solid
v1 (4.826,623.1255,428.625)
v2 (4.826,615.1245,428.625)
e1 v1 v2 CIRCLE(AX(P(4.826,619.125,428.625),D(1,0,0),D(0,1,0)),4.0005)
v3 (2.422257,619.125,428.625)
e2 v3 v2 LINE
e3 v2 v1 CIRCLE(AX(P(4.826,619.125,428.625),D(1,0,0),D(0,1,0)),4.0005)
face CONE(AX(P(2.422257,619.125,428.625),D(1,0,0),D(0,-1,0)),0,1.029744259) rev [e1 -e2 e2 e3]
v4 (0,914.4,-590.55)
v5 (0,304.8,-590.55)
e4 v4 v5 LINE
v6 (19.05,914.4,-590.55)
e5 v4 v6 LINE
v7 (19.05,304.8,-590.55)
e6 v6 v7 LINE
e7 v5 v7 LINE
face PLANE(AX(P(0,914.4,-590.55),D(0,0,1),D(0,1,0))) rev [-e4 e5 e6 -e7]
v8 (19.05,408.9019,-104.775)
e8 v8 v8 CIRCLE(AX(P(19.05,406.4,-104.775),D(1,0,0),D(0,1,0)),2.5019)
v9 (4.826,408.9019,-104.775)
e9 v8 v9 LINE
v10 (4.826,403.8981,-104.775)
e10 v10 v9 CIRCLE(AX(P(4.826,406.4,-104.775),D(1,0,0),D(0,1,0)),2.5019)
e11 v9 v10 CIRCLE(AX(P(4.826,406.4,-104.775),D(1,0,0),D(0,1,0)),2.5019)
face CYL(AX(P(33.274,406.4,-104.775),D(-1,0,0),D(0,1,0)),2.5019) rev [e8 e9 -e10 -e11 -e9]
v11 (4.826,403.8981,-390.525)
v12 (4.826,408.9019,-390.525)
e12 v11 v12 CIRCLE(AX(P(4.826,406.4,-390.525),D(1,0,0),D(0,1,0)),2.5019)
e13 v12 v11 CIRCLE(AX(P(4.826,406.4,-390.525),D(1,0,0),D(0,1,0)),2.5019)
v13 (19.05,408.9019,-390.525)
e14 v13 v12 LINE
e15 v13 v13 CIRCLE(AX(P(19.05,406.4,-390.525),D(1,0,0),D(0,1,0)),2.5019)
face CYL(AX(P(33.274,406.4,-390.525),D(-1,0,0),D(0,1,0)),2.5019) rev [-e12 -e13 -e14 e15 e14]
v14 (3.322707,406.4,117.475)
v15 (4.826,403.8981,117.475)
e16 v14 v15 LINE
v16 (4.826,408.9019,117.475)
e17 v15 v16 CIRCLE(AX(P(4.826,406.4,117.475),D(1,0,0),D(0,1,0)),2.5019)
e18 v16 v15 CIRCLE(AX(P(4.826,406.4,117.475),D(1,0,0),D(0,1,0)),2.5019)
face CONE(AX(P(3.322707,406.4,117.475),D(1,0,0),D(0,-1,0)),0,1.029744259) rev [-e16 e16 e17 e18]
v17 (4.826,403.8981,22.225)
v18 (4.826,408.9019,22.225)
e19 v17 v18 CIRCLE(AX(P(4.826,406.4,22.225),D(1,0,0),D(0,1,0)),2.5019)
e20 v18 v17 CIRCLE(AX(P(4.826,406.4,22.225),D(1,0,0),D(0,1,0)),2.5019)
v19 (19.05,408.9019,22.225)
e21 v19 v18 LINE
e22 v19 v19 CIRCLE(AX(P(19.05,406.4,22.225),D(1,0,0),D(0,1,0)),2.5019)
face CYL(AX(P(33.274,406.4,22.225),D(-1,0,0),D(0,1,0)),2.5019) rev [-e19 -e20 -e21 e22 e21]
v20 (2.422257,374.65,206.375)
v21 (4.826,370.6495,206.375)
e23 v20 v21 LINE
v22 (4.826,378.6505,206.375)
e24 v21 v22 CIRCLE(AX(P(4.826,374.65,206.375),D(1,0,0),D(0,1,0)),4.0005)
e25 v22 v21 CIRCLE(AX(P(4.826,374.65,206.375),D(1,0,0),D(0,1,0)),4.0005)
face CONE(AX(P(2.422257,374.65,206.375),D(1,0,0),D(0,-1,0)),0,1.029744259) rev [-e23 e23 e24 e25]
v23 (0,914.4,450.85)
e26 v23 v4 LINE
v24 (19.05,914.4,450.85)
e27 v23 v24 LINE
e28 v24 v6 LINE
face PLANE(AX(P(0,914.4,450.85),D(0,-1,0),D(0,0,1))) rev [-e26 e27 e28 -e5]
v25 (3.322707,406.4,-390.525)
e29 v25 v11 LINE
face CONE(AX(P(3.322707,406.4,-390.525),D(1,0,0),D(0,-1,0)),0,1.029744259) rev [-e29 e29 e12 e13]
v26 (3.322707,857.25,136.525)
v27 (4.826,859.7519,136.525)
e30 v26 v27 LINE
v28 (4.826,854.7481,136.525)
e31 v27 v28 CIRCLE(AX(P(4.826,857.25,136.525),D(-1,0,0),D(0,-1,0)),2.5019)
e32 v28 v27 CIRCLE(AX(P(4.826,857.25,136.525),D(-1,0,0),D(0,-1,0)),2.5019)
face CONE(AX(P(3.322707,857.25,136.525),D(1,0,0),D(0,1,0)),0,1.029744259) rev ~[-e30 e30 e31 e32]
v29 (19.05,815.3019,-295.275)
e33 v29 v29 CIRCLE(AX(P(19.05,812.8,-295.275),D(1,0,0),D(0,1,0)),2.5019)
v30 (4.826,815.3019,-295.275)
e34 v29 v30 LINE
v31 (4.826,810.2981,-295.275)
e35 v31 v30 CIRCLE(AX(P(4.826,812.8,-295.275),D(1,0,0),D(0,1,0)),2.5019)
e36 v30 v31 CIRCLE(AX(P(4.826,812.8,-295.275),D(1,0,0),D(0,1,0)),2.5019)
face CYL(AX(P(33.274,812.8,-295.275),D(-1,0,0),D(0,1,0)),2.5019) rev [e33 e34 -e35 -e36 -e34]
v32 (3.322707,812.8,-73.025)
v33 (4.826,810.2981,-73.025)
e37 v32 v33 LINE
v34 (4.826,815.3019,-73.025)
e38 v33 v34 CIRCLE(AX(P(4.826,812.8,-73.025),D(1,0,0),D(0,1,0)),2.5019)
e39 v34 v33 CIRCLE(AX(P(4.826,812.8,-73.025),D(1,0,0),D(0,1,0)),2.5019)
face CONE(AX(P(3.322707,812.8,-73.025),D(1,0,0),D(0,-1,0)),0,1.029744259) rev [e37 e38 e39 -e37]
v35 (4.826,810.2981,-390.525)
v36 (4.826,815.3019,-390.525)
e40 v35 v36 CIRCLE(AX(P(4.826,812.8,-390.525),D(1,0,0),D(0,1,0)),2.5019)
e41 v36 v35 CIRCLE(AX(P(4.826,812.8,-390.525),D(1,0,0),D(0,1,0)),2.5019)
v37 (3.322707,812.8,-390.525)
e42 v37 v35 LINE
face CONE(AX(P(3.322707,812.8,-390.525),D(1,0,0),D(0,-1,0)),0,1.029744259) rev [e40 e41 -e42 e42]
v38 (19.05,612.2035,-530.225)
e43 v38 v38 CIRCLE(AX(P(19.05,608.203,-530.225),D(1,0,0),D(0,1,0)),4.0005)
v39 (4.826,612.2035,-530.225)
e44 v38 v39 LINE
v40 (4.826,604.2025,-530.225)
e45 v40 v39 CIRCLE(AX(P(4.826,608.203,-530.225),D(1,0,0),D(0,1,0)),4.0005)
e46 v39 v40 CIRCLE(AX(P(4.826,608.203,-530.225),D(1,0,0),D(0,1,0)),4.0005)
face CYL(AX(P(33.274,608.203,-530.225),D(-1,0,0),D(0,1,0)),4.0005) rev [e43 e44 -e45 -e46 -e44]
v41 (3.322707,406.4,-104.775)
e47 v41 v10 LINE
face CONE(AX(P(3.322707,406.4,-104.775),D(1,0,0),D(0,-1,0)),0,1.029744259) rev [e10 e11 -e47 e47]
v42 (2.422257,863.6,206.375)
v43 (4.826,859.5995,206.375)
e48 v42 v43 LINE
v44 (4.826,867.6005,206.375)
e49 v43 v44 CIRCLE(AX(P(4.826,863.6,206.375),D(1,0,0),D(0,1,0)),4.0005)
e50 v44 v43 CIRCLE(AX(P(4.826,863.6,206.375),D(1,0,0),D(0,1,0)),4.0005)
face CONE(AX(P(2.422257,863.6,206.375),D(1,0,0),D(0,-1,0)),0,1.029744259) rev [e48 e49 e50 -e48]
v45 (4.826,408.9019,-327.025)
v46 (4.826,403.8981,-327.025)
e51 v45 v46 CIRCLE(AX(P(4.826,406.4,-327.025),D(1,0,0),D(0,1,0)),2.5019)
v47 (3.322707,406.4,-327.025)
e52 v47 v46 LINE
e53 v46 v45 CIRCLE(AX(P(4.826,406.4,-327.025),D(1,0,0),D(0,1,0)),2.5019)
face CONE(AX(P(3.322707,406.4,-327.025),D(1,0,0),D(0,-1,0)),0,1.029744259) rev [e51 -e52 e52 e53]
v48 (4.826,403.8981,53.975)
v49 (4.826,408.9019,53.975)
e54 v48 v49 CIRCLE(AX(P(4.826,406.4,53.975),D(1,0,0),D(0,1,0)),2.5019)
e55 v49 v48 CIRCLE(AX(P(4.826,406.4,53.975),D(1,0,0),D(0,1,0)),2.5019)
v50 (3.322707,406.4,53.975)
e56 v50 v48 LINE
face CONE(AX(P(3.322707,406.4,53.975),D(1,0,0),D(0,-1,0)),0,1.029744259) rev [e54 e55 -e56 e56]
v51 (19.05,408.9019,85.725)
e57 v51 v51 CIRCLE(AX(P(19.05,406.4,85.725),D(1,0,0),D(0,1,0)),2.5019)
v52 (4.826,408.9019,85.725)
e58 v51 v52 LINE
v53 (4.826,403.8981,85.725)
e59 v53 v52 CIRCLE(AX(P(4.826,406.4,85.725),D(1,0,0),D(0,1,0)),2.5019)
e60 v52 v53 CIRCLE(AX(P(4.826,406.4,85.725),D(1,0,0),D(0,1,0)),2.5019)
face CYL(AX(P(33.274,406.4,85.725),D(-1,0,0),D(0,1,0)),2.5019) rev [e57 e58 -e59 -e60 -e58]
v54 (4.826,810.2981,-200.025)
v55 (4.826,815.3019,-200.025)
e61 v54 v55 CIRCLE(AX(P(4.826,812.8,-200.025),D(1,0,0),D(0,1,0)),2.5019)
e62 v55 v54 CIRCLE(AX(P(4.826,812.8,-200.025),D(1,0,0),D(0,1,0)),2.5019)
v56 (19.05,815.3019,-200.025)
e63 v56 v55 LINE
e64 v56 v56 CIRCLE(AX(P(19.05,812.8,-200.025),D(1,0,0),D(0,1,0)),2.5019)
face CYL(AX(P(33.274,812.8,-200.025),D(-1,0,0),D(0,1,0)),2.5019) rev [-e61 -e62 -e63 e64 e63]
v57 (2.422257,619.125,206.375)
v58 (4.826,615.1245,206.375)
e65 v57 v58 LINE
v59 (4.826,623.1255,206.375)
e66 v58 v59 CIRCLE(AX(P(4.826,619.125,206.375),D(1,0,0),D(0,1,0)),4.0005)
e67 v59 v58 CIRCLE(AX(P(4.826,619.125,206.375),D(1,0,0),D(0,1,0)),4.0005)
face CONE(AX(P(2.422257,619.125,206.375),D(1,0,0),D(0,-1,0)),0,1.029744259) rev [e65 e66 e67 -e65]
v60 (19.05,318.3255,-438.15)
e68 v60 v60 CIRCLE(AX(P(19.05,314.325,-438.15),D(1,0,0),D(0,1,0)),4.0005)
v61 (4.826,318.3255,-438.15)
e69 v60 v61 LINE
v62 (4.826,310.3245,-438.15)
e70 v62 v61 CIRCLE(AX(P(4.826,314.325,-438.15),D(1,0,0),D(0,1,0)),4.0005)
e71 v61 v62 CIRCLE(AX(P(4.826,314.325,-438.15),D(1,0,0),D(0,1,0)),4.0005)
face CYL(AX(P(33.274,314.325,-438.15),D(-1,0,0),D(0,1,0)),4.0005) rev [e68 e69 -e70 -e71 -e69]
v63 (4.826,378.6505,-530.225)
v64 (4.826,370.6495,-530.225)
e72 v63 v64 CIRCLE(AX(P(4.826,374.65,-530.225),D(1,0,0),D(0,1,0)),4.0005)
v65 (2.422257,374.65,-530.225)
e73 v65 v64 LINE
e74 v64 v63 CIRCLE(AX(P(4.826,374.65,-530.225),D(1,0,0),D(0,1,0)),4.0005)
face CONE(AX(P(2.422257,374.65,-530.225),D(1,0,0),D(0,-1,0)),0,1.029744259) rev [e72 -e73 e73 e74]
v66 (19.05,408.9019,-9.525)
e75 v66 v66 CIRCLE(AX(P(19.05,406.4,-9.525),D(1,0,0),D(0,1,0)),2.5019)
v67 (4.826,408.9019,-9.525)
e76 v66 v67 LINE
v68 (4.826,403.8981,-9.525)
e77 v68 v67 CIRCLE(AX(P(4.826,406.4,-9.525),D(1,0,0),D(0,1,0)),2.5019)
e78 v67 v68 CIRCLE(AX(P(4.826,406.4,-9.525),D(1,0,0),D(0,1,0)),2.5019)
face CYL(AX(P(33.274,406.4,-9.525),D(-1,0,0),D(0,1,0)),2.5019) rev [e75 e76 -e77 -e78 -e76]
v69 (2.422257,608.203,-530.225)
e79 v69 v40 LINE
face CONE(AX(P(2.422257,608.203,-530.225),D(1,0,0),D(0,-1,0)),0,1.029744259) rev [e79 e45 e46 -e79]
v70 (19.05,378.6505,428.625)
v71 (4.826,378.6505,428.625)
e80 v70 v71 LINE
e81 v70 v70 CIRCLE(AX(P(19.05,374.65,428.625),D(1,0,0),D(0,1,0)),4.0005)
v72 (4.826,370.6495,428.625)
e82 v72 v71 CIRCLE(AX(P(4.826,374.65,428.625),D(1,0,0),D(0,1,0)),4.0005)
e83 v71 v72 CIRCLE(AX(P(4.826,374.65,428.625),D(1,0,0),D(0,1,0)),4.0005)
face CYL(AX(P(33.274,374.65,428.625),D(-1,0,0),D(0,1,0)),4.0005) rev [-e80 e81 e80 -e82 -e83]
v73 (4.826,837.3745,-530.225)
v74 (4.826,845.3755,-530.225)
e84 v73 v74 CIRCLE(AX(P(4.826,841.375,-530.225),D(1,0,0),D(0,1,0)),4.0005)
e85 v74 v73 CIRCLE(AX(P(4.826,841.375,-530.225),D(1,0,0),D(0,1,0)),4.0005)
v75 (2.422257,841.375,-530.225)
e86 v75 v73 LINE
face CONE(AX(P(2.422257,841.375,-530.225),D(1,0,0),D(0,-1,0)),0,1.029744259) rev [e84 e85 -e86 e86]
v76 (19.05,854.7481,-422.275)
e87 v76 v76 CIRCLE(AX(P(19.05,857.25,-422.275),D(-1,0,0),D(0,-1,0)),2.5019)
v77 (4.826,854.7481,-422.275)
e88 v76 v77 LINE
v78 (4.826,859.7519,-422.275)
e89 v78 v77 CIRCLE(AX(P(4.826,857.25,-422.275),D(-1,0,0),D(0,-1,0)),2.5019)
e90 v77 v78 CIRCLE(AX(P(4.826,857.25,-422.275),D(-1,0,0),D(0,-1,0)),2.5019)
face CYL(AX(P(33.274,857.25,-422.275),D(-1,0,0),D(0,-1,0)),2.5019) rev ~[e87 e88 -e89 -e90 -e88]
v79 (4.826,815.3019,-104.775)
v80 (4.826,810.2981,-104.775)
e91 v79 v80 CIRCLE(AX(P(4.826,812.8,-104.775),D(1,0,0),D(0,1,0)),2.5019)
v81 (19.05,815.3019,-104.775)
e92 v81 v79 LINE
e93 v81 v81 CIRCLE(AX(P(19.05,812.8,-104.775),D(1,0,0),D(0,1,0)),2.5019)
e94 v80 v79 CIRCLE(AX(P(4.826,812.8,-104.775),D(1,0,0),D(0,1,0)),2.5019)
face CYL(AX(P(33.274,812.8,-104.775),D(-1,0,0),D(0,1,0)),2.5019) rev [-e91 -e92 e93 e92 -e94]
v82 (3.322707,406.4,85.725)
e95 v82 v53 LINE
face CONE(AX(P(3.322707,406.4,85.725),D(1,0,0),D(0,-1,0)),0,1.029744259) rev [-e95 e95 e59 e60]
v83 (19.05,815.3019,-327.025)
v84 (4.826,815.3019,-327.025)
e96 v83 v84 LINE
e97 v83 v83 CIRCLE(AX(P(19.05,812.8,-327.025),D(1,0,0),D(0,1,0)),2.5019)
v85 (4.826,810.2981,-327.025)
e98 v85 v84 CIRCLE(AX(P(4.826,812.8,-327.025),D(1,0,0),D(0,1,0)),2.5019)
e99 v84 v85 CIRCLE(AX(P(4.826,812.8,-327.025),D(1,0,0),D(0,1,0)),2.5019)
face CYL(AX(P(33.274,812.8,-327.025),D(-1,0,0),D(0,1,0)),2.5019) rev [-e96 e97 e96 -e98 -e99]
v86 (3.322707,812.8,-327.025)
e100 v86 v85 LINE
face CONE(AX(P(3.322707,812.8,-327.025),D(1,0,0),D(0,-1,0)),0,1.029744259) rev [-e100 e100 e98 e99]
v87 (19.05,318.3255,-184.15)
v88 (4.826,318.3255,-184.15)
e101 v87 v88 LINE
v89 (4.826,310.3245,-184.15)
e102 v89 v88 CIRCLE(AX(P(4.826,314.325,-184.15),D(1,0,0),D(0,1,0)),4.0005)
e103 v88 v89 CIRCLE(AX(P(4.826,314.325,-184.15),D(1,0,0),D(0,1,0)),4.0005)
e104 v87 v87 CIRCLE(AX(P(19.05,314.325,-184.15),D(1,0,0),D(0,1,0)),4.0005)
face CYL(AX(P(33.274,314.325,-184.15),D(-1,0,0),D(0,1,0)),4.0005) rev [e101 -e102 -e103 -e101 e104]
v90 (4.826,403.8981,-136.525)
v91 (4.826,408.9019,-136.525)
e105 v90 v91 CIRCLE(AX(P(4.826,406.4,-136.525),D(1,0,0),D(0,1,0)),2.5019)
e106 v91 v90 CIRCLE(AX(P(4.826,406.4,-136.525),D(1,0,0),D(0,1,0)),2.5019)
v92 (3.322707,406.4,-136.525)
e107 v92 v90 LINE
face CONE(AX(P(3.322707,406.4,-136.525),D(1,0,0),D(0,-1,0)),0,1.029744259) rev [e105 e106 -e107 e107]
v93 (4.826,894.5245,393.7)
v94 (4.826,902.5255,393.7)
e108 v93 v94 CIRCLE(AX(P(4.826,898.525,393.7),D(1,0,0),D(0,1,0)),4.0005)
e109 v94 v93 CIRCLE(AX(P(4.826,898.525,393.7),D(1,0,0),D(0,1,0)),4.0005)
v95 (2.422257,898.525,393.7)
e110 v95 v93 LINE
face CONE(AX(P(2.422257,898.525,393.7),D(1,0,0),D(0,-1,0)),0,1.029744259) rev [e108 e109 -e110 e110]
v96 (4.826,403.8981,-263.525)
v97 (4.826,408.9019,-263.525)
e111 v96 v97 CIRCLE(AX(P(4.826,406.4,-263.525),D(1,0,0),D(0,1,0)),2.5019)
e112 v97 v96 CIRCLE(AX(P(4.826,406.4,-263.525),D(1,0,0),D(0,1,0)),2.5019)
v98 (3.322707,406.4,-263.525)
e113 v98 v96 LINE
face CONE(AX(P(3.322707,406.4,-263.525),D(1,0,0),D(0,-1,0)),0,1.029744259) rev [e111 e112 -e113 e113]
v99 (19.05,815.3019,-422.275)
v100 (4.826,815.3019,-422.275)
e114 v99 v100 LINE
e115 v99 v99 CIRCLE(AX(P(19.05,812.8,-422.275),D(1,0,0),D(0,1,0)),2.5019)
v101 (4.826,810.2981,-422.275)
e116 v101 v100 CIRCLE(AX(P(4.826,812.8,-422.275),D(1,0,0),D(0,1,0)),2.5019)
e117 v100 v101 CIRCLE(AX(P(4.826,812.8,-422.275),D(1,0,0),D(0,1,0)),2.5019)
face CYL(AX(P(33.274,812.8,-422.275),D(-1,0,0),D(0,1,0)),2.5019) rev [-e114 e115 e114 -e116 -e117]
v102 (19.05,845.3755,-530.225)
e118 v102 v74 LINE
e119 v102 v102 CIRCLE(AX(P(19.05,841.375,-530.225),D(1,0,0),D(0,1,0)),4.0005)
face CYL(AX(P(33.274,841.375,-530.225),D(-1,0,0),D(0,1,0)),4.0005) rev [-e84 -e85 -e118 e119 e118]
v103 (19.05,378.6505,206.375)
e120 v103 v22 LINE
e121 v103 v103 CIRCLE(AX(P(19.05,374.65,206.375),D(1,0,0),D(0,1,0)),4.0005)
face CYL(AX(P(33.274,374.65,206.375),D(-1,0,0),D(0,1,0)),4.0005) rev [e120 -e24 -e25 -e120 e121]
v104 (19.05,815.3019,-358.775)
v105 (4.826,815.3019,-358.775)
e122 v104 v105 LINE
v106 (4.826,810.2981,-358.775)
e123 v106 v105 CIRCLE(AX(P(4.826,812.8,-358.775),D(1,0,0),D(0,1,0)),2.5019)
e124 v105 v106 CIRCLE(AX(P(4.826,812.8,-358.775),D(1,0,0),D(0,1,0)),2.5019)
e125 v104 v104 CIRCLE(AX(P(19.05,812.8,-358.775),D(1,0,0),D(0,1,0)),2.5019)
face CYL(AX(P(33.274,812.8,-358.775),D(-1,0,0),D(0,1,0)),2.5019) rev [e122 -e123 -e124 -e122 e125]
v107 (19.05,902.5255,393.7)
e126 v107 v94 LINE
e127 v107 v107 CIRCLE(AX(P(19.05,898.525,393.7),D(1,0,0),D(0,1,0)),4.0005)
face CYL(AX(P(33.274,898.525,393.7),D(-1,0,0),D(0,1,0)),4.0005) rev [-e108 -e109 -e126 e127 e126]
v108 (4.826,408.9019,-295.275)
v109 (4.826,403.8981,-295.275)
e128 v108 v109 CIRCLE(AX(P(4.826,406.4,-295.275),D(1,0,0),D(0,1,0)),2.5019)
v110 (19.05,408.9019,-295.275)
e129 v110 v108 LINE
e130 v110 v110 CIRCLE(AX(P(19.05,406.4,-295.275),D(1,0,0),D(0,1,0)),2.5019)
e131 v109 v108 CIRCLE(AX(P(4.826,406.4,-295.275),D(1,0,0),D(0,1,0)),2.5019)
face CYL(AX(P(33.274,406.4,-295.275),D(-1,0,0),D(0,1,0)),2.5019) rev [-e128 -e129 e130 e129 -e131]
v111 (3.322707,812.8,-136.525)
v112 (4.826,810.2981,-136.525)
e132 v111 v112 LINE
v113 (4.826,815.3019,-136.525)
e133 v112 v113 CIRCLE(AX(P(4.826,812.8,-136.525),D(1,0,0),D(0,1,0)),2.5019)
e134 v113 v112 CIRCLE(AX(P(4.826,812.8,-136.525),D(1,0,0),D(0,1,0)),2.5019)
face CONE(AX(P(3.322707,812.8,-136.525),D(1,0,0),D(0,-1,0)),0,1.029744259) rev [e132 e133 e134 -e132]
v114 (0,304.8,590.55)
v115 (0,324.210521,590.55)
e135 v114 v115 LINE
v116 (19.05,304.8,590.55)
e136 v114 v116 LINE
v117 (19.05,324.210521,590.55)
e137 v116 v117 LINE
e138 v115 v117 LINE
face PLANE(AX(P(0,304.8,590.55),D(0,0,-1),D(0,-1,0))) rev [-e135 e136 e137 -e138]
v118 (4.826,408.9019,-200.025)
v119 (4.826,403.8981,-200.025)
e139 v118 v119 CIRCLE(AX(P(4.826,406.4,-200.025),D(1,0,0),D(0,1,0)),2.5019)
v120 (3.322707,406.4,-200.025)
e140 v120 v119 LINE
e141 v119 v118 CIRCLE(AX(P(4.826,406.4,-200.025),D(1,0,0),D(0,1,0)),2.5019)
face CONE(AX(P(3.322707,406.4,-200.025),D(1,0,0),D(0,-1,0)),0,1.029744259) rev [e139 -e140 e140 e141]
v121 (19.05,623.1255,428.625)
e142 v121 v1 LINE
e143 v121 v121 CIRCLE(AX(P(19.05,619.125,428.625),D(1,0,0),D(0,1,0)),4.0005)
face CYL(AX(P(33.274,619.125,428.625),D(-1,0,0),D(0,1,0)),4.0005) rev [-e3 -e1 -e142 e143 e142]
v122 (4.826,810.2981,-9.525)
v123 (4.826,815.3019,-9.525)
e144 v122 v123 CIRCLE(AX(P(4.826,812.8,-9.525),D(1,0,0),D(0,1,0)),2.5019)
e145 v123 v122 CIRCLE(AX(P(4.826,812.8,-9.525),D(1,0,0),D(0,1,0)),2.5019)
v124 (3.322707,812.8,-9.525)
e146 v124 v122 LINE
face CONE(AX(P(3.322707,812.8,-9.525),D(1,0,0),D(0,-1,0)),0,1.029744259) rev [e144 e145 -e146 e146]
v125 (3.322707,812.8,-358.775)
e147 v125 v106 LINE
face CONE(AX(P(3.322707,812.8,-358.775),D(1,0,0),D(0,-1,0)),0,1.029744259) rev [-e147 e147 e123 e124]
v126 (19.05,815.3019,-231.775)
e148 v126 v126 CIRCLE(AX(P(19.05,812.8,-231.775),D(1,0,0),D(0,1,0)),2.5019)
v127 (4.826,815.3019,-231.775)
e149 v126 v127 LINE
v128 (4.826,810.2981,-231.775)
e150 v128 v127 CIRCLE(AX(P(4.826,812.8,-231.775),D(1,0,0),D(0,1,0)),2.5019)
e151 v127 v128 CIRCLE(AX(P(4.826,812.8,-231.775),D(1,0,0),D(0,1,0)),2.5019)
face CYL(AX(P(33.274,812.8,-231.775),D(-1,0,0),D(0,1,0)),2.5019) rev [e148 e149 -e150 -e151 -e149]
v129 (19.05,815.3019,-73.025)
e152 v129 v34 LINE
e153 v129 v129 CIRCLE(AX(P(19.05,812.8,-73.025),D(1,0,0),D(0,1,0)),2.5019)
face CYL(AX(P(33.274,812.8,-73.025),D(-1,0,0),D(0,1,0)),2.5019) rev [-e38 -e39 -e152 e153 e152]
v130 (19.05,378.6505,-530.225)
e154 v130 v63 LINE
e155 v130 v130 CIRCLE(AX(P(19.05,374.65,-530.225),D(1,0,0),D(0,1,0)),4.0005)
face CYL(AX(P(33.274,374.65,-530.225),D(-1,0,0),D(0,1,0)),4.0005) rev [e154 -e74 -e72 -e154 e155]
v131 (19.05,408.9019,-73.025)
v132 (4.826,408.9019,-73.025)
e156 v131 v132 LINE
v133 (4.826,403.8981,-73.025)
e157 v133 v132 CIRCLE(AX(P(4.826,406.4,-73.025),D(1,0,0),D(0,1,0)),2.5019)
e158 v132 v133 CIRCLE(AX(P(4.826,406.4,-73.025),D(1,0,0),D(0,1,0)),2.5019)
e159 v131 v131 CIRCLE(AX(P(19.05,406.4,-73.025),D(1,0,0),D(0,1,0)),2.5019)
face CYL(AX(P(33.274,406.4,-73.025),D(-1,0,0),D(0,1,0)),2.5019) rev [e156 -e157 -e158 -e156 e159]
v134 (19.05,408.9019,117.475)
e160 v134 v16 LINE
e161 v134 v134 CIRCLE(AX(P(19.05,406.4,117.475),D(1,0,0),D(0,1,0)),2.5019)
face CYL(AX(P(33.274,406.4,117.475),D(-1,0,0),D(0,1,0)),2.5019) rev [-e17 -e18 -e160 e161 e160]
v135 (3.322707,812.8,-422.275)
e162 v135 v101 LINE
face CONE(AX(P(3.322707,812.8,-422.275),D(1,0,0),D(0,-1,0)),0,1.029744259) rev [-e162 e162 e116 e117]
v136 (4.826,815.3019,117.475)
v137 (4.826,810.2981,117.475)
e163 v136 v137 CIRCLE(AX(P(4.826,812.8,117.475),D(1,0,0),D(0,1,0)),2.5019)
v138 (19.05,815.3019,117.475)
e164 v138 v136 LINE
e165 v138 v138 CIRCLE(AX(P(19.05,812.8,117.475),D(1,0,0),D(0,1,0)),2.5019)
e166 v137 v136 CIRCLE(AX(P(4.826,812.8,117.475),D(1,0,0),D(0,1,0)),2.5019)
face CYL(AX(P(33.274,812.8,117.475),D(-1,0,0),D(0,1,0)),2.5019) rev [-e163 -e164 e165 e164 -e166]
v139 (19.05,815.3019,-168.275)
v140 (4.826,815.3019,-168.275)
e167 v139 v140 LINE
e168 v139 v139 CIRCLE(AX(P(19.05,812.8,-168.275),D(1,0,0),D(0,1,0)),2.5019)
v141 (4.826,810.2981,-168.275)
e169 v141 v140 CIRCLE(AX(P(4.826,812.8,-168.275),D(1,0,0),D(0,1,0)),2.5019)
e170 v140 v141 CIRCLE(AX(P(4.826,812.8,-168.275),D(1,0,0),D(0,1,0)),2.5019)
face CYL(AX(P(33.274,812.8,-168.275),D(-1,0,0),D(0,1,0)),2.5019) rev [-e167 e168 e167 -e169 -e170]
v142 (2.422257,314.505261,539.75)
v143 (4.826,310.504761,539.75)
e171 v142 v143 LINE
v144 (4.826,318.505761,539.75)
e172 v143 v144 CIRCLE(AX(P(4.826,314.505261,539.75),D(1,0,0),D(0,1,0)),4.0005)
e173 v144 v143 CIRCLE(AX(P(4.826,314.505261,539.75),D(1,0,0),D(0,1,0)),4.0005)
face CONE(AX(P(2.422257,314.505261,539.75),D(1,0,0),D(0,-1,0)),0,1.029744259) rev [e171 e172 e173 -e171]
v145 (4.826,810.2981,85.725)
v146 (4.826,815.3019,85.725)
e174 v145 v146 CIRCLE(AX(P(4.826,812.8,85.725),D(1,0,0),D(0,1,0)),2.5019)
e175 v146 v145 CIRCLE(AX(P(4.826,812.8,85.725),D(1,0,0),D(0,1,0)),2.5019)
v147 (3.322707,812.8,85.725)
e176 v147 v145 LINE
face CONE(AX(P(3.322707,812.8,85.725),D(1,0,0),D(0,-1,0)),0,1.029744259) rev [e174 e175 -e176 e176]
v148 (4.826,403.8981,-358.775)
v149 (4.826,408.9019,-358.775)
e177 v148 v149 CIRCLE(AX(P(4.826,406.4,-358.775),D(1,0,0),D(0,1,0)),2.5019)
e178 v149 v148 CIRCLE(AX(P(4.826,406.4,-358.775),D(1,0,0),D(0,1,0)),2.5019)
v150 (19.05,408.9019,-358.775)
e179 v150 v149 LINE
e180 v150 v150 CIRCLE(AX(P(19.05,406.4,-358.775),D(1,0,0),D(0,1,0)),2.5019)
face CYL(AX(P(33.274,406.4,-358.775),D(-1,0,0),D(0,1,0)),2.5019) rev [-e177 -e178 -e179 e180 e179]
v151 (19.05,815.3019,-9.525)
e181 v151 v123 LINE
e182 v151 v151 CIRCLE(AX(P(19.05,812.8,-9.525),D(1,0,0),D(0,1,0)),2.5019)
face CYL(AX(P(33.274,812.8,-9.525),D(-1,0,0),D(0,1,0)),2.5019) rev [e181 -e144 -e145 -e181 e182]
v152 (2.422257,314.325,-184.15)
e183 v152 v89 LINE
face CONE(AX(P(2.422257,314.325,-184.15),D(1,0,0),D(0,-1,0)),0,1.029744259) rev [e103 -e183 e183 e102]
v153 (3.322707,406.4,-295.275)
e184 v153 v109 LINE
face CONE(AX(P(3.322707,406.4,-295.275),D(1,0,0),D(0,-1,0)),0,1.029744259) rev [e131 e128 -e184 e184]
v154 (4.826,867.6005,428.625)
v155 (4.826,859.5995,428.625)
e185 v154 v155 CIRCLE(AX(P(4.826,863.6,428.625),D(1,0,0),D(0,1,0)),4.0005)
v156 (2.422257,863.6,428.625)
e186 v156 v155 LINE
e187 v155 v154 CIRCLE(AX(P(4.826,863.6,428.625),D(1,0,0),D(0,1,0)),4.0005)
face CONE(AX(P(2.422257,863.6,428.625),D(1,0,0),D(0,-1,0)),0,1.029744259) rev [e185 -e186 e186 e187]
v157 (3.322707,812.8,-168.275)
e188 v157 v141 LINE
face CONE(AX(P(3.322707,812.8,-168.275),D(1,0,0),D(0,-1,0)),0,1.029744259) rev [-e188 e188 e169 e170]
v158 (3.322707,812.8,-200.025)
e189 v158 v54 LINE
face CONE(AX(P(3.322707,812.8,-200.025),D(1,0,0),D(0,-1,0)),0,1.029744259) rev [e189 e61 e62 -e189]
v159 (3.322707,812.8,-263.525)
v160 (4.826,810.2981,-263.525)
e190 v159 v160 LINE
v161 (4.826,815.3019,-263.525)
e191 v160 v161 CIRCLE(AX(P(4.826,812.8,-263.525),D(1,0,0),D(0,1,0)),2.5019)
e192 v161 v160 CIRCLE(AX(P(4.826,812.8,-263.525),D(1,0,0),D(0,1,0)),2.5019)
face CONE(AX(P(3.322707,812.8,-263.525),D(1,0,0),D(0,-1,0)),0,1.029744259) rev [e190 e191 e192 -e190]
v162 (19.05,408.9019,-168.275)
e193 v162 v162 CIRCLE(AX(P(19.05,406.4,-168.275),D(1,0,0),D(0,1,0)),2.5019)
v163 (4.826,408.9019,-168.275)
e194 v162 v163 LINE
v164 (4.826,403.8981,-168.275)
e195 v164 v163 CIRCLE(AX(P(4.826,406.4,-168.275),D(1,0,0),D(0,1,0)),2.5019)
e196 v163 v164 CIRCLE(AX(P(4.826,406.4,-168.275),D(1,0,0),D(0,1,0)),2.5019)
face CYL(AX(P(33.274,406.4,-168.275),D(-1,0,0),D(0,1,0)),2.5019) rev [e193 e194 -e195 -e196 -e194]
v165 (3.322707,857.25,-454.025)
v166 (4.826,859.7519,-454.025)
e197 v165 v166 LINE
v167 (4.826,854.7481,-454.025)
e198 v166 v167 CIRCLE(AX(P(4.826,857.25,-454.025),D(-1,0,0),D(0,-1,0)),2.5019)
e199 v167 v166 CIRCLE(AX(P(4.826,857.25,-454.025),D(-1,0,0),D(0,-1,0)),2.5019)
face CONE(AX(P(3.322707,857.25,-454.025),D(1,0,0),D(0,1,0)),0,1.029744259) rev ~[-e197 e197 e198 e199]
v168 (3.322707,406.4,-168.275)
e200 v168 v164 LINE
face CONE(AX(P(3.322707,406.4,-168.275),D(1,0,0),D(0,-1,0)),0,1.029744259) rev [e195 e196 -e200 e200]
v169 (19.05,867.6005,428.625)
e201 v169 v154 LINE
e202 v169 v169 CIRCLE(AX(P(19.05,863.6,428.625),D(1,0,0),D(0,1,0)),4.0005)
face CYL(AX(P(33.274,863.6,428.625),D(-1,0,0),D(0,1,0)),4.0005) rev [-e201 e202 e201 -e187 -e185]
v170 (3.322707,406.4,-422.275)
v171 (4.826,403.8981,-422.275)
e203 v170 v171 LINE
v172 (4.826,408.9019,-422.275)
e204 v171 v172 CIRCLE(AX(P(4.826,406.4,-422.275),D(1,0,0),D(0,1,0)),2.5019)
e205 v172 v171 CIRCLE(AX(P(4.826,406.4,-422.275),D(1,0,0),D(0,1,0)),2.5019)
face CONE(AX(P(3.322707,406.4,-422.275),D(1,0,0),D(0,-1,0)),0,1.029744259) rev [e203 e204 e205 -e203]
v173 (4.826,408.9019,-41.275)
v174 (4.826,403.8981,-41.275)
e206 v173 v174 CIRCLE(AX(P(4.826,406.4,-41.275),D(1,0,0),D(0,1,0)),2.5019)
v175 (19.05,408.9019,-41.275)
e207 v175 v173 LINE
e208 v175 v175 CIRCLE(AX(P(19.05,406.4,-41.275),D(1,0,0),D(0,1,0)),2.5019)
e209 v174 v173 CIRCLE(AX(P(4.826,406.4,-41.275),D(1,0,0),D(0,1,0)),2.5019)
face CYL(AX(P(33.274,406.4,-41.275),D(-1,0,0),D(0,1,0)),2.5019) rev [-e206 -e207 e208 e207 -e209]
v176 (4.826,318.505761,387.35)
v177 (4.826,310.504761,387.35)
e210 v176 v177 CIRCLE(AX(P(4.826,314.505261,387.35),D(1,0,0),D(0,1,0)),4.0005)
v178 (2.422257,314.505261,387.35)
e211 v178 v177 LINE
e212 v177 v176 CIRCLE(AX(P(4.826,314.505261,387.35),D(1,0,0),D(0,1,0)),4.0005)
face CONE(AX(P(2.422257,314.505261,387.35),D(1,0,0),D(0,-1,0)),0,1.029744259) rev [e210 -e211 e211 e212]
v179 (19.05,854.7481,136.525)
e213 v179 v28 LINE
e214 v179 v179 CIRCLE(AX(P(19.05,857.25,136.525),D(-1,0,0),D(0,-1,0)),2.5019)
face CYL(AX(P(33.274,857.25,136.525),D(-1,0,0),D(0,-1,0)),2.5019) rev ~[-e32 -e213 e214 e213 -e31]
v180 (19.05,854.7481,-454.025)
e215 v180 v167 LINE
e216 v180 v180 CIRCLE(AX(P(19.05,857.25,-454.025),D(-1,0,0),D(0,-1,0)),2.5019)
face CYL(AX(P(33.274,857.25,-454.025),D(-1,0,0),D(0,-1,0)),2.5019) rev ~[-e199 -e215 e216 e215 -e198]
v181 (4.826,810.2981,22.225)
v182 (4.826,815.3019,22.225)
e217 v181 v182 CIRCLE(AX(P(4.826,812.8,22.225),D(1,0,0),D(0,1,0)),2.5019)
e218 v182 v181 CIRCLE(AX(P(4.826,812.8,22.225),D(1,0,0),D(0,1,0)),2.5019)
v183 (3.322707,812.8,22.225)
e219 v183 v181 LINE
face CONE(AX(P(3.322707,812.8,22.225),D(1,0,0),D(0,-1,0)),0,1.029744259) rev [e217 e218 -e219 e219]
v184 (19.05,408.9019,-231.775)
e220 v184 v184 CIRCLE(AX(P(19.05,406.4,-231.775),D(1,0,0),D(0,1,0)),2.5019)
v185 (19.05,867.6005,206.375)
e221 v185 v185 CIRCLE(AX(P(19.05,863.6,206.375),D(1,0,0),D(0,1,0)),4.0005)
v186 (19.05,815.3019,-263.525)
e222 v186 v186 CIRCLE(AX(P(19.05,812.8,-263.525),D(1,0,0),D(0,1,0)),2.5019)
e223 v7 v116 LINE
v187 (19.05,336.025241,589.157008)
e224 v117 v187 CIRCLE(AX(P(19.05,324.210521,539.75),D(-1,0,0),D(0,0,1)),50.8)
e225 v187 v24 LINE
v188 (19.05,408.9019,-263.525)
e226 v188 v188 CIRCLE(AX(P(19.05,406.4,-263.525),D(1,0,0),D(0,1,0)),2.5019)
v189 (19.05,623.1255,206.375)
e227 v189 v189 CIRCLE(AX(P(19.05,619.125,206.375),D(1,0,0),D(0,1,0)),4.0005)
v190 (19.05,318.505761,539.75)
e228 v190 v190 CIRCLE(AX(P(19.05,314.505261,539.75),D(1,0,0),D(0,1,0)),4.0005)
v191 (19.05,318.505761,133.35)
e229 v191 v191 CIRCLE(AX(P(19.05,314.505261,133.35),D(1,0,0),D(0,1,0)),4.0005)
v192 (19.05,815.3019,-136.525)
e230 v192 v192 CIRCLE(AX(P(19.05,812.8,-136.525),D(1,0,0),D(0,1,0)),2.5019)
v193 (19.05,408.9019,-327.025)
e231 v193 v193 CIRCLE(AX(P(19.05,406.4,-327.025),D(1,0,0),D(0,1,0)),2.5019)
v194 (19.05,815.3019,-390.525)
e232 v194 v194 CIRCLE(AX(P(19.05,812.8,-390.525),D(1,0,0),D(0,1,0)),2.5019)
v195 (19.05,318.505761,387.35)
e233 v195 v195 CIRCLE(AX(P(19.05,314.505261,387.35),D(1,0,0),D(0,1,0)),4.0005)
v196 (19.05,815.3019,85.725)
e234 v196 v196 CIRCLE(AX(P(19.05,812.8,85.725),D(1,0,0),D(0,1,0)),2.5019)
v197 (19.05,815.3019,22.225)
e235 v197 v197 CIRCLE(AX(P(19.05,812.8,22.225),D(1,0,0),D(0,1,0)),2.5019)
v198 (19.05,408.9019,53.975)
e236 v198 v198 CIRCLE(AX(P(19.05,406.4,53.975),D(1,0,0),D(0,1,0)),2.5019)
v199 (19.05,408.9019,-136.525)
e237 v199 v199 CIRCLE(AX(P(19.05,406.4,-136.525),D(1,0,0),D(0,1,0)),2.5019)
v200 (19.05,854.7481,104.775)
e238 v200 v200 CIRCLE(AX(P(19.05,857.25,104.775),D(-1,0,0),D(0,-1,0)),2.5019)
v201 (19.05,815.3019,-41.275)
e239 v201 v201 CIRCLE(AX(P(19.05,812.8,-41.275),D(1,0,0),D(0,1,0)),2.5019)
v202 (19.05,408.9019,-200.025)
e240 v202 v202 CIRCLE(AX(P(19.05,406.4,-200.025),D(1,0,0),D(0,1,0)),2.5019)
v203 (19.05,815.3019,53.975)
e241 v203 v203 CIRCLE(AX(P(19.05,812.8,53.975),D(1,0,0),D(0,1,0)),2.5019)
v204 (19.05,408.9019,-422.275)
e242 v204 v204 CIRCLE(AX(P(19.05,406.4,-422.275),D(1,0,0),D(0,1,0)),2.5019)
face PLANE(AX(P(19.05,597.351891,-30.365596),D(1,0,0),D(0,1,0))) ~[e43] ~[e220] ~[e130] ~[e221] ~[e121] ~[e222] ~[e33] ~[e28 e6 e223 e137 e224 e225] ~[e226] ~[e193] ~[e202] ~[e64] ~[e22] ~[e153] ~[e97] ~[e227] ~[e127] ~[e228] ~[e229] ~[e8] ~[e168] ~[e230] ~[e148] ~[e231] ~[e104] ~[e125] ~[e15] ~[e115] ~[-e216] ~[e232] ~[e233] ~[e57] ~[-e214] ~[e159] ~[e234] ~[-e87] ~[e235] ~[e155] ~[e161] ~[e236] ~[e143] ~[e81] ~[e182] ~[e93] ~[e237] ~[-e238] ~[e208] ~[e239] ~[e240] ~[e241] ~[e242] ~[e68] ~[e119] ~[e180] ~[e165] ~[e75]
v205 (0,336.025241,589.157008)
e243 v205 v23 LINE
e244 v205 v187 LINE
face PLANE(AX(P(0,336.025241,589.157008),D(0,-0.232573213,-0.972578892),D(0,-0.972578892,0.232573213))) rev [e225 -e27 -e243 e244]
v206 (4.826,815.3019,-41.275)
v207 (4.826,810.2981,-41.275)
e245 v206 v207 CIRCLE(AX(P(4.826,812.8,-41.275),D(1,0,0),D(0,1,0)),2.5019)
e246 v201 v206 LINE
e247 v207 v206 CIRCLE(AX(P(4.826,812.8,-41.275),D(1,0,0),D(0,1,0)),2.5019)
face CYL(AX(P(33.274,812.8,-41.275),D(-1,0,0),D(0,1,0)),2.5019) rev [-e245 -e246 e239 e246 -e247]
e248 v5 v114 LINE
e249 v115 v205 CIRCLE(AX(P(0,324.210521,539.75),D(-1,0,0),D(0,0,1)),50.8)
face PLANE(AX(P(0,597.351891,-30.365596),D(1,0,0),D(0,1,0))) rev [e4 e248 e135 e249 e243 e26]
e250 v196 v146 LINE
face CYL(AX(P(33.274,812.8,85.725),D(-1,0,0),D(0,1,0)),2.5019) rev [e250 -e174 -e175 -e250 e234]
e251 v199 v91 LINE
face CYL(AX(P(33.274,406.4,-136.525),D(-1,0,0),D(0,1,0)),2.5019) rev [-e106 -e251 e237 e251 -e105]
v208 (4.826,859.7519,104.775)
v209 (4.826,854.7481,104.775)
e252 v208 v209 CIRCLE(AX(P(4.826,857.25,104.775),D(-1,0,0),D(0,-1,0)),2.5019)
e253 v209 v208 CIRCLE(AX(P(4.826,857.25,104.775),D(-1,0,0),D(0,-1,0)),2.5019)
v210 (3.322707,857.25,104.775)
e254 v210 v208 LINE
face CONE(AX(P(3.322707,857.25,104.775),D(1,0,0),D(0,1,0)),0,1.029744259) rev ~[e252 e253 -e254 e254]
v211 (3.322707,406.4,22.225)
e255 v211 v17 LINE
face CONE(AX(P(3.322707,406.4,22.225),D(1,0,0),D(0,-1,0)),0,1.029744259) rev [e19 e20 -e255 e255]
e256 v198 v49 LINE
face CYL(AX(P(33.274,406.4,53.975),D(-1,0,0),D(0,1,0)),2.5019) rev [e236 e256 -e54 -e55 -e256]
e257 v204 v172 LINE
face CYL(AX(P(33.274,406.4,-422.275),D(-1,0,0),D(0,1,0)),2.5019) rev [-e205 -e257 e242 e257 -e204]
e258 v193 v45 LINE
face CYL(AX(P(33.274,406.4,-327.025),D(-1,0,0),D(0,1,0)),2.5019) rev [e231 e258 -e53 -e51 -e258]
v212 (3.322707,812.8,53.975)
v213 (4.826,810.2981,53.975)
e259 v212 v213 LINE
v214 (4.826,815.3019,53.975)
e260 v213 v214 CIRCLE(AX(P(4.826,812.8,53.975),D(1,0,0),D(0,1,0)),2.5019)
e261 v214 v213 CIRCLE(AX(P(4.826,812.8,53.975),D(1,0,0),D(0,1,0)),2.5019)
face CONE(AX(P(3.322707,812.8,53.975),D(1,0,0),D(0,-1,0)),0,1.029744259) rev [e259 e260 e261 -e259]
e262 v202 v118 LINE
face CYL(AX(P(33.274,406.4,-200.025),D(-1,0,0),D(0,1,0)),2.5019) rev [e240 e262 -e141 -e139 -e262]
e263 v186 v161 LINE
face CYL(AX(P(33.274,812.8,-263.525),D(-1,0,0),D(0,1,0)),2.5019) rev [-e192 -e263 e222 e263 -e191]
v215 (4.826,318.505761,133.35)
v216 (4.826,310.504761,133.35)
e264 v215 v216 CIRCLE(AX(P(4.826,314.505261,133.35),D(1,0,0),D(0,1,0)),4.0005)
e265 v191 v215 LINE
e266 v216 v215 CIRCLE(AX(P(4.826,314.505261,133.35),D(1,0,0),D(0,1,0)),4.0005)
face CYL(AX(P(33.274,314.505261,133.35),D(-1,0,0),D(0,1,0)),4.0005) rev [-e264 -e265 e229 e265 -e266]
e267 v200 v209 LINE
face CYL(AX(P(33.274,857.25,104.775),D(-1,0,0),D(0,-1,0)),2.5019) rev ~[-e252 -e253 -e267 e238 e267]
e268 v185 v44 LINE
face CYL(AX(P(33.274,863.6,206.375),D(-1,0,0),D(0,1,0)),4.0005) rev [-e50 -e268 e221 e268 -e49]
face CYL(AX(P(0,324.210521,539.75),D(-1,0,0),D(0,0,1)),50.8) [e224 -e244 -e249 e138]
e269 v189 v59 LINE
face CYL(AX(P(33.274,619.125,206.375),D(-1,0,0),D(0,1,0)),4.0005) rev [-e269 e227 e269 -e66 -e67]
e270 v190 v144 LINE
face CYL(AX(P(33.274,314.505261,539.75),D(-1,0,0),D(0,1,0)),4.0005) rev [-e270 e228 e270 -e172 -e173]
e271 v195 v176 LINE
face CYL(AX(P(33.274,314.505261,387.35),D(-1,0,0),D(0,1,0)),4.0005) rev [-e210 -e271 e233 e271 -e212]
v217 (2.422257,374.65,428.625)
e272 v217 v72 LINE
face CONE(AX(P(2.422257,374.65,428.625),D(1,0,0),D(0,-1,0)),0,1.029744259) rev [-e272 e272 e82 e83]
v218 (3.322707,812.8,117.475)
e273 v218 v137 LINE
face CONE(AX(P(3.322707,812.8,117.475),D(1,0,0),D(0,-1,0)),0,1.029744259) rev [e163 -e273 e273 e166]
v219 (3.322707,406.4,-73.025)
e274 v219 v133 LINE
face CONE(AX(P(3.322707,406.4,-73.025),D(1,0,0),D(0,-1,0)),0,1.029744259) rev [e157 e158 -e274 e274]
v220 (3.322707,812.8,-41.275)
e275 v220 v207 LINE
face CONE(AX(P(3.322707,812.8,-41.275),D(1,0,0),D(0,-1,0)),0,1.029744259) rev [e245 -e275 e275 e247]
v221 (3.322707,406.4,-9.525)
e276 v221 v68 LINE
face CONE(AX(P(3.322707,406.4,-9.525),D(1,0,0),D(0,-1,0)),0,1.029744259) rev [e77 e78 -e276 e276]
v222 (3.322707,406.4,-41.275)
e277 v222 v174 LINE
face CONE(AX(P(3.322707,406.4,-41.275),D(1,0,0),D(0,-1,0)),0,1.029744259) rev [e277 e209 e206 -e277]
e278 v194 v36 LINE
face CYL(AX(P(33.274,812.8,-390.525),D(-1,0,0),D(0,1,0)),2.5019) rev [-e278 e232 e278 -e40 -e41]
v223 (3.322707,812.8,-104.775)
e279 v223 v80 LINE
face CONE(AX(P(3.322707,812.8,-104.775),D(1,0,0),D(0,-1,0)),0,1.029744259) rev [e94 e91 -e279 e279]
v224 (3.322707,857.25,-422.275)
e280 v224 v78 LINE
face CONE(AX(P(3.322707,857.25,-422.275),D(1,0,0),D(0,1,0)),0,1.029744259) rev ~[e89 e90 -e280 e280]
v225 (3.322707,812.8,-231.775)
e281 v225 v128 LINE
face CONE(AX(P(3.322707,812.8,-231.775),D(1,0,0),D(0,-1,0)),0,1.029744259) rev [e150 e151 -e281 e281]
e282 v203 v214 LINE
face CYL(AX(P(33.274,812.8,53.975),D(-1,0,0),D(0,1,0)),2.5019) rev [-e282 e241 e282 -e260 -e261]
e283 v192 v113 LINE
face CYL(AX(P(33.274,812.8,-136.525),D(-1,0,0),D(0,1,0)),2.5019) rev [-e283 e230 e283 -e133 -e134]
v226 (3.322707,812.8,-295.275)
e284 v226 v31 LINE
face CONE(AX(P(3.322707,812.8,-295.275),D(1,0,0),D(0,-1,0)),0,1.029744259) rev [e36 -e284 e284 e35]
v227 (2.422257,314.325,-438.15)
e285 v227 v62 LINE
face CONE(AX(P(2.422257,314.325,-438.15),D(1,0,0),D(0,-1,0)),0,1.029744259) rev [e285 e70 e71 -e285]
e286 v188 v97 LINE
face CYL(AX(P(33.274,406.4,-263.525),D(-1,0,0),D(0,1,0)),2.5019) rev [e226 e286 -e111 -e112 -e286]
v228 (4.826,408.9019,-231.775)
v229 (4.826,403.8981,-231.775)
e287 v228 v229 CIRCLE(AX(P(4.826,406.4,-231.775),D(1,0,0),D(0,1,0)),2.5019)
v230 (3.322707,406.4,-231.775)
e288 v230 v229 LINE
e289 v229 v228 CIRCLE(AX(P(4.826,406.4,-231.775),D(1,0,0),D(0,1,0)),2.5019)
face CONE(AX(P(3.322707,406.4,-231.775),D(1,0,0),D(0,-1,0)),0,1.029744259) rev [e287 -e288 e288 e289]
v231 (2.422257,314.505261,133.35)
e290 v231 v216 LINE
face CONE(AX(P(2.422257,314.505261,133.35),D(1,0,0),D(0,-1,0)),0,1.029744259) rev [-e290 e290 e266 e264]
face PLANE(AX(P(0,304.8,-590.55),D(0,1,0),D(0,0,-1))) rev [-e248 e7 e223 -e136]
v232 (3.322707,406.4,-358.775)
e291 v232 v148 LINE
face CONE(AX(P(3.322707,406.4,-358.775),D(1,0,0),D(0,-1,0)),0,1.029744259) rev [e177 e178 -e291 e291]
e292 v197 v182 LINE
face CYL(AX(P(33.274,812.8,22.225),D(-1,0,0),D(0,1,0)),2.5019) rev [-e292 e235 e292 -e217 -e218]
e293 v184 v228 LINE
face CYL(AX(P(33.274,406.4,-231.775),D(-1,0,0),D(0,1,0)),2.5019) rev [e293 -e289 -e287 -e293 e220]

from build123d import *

# Parameters (mm, degrees)
F1_DEPTH = 19.05
F3_D     = 8.001
F3_DEPTH = 14.224
F3_TIP   = 2.4037429064
F5_D     = 5.0038
F5_DEPTH = 14.224
F5_TIP   = 1.5032931827
F9_D     = 5.0038
F9_DEPTH = 14.224
F9_TIP   = 1.5032931827


# Not quite as in the source:
# - a feature names something its author has since deleted; it is built from what else it names


with BuildPart() as f1:
    # F0 (on Right) → F1 (new body)
    with BuildSketch(Plane.YZ):
        with BuildLine():
            Line((304.8, -590.55), (304.8, 590.55))
            Line((304.8, 590.55), (285.3894786878, 590.55))
            ThreePointArc((285.3894786878, 590.55), (279.4412012464, 590.2005500018), (273.5747594562, 589.157007696))
            Line((273.5747594562, 589.157007696), (-304.8, 450.85))
            Line((-304.8, 450.85), (-304.8, 428.625))
            Line((-304.8, 428.625), (-304.8, -590.55))
            Line((-304.8, -590.55), (304.8, -590.55))
        make_face()
    extrude(amount=F1_DEPTH)

    # F3
    with Locations(Plane.YZ.offset(19.05)):
        with Locations((-254, 428.625), (-288.925, 393.7), (-9.525, 428.625), (234.95, 428.625), (-254, 206.375), (-9.525, 206.375), (234.95, 206.375), (295.0947393439, 539.75), (295.0947393439, 387.35), (295.0947393439, 133.35), (295.275, -184.15), (295.275, -438.15), (234.95, -530.225), (-231.775, -530.225), (1.397, -530.225)):
            Hole(F3_D / 2, depth=F3_DEPTH)
            with Locations((0, 0, -(F3_DEPTH + F3_TIP / 2))):  # 118° drill point
                Cone(0, F3_D / 2, F3_TIP, mode=Mode.SUBTRACT)

    # F5
    with Locations(Plane.YZ.offset(19.05)):
        with Locations((-203.2, 117.475), (-203.2, 85.725), (-203.2, 53.975), (-203.2, 22.225), (-203.2, -9.525), (-203.2, -41.275), (-203.2, -73.025), (-203.2, -104.775), (-203.2, -136.525), (-203.2, -168.275), (-203.2, -200.025), (-203.2, -231.775), (-203.2, -263.525), (-203.2, -295.275), (-203.2, -327.025), (-203.2, -358.775), (-203.2, -390.525), (-203.2, -422.275), (203.2, -422.275), (203.2, -390.525), (203.2, -358.775), (203.2, -327.025), (203.2, -295.275), (203.2, -263.525), (203.2, -231.775), (203.2, -200.025), (203.2, -168.275), (203.2, -136.525), (203.2, -104.775), (203.2, -73.025), (203.2, -41.275), (203.2, -9.525), (203.2, 22.225), (203.2, 53.975), (203.2, 85.725), (203.2, 117.475)):
            Hole(F5_D / 2, depth=F5_DEPTH)
            with Locations((0, 0, -(F5_DEPTH + F5_TIP / 2))):  # 118° drill point
                Cone(0, F5_D / 2, F5_TIP, mode=Mode.SUBTRACT)


with BuildPart() as f6_1:
    # F6: instance of F1
    add(f1.part.mirror(Plane(origin=(9.525, 304.8, 0), x_dir=(-1, 0, 0), z_dir=(0, 1, 0))))

    # F9
    with Locations(Plane.YZ.offset(19.05)):
        with Locations((857.25, 136.525), (857.25, 104.775), (857.25, -422.275), (857.25, -454.025)):
            Hole(F9_D / 2, depth=F9_DEPTH)
            with Locations((0, 0, -(F9_DEPTH + F9_TIP / 2))):  # 118° drill point
                Cone(0, F9_D / 2, F9_TIP, mode=Mode.SUBTRACT)


solid = f6_1.part
